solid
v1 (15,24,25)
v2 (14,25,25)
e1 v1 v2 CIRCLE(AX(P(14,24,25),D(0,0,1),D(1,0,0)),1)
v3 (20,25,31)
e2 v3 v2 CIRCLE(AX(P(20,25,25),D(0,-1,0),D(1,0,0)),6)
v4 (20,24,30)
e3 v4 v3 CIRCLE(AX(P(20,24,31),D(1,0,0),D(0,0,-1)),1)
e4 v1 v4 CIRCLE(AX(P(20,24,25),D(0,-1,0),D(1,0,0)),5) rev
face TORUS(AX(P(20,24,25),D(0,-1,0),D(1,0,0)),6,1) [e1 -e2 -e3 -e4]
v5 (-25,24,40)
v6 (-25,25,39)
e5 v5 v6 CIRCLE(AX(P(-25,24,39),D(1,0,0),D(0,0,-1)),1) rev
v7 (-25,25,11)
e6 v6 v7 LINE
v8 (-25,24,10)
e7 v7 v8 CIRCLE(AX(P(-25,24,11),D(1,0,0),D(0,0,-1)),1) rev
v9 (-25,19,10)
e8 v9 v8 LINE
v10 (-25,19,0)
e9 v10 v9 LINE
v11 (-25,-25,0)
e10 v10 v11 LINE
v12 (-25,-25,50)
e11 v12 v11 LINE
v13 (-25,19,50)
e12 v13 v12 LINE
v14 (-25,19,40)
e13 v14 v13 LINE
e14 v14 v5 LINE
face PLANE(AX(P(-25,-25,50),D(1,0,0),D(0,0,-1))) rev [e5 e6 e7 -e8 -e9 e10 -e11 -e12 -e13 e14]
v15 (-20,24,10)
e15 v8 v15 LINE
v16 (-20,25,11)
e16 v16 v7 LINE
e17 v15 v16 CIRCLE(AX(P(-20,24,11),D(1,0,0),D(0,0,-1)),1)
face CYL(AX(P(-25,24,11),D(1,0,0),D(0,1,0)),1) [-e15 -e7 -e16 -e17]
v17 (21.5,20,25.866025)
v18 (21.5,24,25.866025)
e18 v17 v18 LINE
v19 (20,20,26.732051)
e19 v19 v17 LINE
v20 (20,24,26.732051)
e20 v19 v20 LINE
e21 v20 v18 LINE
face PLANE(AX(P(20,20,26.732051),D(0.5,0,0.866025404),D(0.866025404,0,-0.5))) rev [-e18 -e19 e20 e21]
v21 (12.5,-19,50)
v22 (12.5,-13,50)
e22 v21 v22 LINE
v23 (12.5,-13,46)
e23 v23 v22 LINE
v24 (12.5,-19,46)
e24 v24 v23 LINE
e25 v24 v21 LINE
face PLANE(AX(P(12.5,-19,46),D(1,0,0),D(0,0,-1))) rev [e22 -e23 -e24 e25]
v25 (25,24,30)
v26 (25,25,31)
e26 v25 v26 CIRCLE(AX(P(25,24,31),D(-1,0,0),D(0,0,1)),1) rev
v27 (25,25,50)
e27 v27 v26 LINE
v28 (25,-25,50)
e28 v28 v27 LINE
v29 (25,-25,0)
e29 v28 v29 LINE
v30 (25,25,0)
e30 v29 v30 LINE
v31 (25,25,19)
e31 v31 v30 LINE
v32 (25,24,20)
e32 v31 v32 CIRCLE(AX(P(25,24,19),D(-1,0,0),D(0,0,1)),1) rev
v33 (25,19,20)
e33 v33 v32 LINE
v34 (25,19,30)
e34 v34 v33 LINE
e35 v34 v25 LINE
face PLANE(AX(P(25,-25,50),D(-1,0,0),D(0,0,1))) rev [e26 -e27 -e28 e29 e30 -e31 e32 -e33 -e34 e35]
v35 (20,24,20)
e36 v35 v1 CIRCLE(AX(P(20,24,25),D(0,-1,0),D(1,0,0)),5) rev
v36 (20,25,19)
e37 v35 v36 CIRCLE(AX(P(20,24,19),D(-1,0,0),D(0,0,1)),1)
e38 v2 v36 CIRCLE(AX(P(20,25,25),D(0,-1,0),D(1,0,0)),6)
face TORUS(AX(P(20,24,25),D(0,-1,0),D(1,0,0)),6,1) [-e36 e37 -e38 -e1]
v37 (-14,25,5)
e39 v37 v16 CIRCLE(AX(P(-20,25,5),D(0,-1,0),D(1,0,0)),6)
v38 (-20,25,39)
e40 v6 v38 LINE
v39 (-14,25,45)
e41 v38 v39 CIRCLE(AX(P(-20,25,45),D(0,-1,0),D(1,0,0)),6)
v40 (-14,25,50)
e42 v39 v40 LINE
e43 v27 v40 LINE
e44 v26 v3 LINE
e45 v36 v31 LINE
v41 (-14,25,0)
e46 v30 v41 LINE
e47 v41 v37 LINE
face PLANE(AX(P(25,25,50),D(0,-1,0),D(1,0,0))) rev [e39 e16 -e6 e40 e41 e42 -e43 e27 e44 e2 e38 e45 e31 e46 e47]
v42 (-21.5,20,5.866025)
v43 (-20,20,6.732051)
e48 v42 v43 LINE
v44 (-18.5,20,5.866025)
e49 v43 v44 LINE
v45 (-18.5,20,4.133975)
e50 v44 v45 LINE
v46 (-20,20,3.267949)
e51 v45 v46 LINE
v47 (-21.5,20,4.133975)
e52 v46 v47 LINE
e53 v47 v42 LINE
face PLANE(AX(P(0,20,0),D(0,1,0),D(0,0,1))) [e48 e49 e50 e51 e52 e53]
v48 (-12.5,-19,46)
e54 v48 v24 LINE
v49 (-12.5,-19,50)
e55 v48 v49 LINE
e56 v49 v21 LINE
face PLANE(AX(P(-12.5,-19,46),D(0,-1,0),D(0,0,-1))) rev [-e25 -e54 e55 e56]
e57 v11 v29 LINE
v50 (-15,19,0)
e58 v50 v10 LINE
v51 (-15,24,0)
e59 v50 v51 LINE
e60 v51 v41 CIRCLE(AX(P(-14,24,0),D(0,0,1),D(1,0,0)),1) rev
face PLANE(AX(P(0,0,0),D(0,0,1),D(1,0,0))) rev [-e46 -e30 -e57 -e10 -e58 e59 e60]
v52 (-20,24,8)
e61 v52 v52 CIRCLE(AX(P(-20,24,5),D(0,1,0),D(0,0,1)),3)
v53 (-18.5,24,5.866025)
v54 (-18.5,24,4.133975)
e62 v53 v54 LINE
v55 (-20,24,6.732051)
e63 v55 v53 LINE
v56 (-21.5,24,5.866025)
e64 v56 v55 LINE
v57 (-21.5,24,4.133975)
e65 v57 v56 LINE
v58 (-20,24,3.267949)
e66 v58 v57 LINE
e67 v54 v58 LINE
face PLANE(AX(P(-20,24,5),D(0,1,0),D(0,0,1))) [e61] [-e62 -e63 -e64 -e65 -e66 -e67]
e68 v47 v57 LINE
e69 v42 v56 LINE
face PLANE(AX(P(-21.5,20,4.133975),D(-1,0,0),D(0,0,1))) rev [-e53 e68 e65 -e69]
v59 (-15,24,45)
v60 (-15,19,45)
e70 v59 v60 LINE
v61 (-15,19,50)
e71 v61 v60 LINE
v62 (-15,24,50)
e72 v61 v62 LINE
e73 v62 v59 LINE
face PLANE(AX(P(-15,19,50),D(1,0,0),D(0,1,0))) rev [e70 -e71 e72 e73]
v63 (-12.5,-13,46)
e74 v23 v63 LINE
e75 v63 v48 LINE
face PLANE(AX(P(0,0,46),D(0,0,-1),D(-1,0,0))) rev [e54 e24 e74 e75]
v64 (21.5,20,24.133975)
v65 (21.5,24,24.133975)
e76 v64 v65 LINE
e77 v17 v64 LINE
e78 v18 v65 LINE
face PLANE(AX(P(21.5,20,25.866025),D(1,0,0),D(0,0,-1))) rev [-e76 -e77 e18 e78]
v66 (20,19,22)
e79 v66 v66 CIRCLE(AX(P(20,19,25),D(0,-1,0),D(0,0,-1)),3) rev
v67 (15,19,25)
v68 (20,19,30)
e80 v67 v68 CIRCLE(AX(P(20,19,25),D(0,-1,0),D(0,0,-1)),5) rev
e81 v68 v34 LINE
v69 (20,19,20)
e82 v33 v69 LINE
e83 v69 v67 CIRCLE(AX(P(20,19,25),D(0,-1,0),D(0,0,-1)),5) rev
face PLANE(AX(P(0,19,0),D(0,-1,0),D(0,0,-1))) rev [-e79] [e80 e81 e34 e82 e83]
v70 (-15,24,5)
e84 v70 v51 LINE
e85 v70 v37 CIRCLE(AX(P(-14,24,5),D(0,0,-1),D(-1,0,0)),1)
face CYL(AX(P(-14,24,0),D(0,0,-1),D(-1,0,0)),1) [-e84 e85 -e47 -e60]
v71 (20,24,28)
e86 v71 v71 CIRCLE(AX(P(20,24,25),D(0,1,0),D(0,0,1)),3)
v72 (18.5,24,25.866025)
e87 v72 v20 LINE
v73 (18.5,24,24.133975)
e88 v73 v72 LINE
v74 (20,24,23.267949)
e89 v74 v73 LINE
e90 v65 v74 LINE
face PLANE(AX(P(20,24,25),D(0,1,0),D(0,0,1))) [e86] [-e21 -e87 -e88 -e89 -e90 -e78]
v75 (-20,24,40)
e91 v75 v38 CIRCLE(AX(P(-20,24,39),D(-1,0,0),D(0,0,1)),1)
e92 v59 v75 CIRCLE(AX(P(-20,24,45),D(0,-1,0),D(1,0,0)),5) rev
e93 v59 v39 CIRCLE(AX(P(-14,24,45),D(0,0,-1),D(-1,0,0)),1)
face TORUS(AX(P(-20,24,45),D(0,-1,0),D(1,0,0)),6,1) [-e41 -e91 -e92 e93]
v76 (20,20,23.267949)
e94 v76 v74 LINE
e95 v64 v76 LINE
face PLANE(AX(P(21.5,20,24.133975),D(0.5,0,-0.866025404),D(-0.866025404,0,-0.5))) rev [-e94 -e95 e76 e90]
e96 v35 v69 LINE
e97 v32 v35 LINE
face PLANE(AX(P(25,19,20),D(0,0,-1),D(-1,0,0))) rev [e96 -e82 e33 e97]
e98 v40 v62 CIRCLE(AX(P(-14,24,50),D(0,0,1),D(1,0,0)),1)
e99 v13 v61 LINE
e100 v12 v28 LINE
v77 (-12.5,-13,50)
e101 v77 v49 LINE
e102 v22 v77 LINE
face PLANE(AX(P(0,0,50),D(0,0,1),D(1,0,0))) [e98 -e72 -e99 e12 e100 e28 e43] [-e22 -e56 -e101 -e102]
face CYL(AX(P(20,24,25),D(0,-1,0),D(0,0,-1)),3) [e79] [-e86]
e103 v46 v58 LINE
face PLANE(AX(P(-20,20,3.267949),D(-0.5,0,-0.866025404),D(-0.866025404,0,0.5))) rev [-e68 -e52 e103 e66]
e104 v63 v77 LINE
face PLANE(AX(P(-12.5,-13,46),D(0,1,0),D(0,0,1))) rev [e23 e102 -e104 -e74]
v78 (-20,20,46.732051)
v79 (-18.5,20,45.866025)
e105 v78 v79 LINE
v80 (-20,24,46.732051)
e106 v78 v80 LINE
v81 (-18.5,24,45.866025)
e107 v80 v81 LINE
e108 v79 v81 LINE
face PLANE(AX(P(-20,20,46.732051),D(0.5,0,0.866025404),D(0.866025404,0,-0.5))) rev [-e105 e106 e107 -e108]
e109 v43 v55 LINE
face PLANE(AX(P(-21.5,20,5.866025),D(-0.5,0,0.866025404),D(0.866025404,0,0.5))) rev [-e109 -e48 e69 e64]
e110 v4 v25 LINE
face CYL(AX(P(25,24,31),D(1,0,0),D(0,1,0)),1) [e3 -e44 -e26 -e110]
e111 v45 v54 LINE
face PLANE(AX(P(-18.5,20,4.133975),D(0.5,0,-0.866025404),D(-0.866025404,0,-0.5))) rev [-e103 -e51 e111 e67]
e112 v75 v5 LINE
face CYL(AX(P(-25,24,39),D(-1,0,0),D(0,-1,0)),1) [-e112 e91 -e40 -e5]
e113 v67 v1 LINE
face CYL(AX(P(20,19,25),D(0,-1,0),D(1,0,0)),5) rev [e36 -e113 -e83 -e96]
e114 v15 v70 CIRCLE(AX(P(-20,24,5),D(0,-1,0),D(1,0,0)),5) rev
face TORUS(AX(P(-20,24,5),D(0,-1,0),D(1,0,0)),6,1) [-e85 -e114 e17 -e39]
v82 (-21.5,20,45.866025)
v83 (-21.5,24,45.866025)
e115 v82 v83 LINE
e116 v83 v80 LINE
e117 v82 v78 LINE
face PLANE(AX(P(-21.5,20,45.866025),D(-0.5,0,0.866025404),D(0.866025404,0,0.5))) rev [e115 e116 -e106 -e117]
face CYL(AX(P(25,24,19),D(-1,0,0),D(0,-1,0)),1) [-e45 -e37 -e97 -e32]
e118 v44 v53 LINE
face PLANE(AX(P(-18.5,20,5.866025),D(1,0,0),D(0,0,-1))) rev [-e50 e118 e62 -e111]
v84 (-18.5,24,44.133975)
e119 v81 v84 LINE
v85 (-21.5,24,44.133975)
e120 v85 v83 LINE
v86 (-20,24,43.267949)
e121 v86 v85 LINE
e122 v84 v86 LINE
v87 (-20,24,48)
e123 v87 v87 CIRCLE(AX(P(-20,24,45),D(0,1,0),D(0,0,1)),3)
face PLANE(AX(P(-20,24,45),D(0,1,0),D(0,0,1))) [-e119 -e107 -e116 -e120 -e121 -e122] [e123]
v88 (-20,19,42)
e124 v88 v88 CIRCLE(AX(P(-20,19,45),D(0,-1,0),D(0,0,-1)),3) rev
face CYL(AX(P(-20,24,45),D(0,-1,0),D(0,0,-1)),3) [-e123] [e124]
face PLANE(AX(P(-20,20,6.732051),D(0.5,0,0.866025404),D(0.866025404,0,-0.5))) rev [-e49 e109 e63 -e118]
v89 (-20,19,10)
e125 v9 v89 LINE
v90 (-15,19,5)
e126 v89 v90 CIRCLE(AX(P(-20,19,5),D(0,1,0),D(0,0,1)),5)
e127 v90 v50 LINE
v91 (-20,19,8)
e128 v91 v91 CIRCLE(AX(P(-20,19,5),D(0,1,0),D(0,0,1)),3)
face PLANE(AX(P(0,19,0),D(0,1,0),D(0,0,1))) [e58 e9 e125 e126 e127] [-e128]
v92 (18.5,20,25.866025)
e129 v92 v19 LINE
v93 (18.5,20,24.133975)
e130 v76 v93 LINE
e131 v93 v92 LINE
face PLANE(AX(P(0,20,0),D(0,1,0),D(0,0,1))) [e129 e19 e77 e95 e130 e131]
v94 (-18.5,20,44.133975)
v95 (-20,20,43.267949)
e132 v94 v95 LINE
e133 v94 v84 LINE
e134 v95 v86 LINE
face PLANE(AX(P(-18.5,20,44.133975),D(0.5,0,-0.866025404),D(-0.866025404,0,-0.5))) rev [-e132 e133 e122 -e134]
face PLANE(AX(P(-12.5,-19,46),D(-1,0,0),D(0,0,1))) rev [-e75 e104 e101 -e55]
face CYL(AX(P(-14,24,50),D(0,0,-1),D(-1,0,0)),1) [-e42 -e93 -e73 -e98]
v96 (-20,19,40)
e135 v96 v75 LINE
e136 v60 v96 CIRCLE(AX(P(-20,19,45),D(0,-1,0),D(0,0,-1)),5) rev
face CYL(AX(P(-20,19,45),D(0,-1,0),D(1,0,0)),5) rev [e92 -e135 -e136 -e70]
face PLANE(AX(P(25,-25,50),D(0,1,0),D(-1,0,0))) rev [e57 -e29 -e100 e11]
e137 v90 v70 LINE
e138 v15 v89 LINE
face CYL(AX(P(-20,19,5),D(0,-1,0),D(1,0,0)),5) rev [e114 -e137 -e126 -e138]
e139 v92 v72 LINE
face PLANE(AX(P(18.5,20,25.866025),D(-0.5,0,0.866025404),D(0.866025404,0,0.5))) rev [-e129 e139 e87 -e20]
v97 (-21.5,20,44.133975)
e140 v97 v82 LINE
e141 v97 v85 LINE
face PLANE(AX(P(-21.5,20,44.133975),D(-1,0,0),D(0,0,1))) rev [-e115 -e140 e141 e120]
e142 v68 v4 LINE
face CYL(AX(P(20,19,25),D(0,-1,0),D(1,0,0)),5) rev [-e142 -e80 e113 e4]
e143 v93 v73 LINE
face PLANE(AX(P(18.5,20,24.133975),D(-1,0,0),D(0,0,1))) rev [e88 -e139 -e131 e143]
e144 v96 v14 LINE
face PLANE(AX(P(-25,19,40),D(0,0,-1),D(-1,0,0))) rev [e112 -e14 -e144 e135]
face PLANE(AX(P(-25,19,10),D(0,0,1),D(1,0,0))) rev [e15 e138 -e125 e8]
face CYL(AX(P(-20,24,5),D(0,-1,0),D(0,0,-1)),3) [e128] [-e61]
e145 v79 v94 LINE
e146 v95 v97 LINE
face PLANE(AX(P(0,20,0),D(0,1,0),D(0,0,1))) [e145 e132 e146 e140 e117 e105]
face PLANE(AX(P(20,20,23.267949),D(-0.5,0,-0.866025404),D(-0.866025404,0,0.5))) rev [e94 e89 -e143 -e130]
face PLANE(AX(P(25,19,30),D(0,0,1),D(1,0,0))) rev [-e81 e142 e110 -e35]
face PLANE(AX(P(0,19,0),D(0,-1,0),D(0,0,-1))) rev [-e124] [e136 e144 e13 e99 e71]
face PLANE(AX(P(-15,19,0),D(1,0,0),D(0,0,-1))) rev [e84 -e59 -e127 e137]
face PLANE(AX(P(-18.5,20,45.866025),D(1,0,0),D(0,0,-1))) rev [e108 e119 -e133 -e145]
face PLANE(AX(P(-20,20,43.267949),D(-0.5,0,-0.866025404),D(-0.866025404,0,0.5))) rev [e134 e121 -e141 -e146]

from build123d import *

# Parameters (mm, degrees)
SKETCH1_W           = 50
SKETCH1_H           = 50
BOSS_EXTRUDE1_DEPTH = 50
SKETCH2_W           = 10
SKETCH2_H           = 10
CUT_EXTRUDE1_DEPTH  = 6
FILLET1_R           = 5
FILLET2_R           = 1
SKETCH4_R           = 3
BOSS_EXTRUDE2_DEPTH = 5
CUT_EXTRUDE2_DEPTH  = 4
SKETCH6_W           = 25
SKETCH6_H           = 6
CUT_EXTRUDE3_DEPTH  = 4


with BuildPart() as part:
    # Sketch1 → Boss-Extrude1 (new body)
    with BuildSketch(Plane.XY):
        Rectangle(SKETCH1_W, SKETCH1_H)
    extrude(amount=BOSS_EXTRUDE1_DEPTH)

    # Sketch2 → Cut-Extrude1 (cut)
    with BuildSketch(Plane(origin=(0, 25, 0), x_dir=(1, 0, 0), z_dir=(0, 1, 0))):
        with Locations((-20, -5)):
            Rectangle(SKETCH2_W, SKETCH2_H)
        with Locations((-20, -45)):
            Rectangle(SKETCH2_W, SKETCH2_H)
        with Locations((20, -25)):
            Rectangle(SKETCH2_W, SKETCH2_H)
    extrude(amount=-CUT_EXTRUDE1_DEPTH, mode=Mode.SUBTRACT)

    # Fillet1
    fillet1_edges = [part.edges().sort_by_distance(p)[0] for p in [
        (15, 22, 30),
        (15, 22, 20),
        (-15, 22, 40),
        (-15, 22, 10),
    ]]
    fillet(fillet1_edges, radius=FILLET1_R - 0.0001)  # a hair under: the kernel refuses the full size

    # Fillet2
    fillet2_edges = [part.edges().sort_by_distance(p)[0] for p in [
        (-22.49995, 25, 10),
        (-15, 25, 47.49995),
        (22.49995, 25, 20),
        (22.49995, 25, 30),
        (-22.49995, 25, 40),
        (-15, 25, 2.50005),
        (16.464436805, 25, 28.535563195),
        (16.464436805, 25, 21.464436805),
        (-16.464436805, 25, 41.464436805),
        (-16.464436805, 25, 8.535563195),
    ]]
    fillet(fillet2_edges, radius=FILLET2_R)

    # Sketch4 → Boss-Extrude2 (add)
    with BuildSketch(Plane(origin=(0, 19, 0), x_dir=(1, 0, 0), z_dir=(0, 1, 0))):
        with Locations(Location((-20, -5, 0), (0, 0, 270))):
            Circle(SKETCH4_R)
        with Locations(Location((-20, -45, 0), (0, 0, 90))):
            Circle(SKETCH4_R)
        with Locations(Location((20, -25, 0), (0, 0, 90))):
            Circle(SKETCH4_R)
    extrude(amount=BOSS_EXTRUDE2_DEPTH)

    # Sketch5 → Cut-Extrude2 (cut)
    with BuildSketch(Plane(origin=(0, 24, 0), x_dir=(1, 0, 0), z_dir=(0, 1, 0))):
        Polygon((-20, -3.267949192), (-21.5, -4.133974596), (-21.5, -5.866025404), (-20, -6.732050808), (-18.5, -5.866025404), (-18.5, -4.133974596), align=None)
        Polygon((-20, -43.267949192), (-21.5, -44.133974596), (-21.5, -45.866025404), (-20, -46.732050808), (-18.5, -45.866025404), (-18.5, -44.133974596), align=None)
        Polygon((20, -23.267949192), (18.5, -24.133974596), (18.5, -25.866025404), (20, -26.732050808), (21.5, -25.866025404), (21.5, -24.133974596), align=None)
    extrude(amount=-CUT_EXTRUDE2_DEPTH, mode=Mode.SUBTRACT)

    # Sketch6 → Cut-Extrude3 (cut)
    with BuildSketch(Plane.XY.offset(50)):
        with Locations((0, -16)):
            Rectangle(SKETCH6_W, SKETCH6_H)
    extrude(amount=-CUT_EXTRUDE3_DEPTH, mode=Mode.SUBTRACT)


solid = part.part
